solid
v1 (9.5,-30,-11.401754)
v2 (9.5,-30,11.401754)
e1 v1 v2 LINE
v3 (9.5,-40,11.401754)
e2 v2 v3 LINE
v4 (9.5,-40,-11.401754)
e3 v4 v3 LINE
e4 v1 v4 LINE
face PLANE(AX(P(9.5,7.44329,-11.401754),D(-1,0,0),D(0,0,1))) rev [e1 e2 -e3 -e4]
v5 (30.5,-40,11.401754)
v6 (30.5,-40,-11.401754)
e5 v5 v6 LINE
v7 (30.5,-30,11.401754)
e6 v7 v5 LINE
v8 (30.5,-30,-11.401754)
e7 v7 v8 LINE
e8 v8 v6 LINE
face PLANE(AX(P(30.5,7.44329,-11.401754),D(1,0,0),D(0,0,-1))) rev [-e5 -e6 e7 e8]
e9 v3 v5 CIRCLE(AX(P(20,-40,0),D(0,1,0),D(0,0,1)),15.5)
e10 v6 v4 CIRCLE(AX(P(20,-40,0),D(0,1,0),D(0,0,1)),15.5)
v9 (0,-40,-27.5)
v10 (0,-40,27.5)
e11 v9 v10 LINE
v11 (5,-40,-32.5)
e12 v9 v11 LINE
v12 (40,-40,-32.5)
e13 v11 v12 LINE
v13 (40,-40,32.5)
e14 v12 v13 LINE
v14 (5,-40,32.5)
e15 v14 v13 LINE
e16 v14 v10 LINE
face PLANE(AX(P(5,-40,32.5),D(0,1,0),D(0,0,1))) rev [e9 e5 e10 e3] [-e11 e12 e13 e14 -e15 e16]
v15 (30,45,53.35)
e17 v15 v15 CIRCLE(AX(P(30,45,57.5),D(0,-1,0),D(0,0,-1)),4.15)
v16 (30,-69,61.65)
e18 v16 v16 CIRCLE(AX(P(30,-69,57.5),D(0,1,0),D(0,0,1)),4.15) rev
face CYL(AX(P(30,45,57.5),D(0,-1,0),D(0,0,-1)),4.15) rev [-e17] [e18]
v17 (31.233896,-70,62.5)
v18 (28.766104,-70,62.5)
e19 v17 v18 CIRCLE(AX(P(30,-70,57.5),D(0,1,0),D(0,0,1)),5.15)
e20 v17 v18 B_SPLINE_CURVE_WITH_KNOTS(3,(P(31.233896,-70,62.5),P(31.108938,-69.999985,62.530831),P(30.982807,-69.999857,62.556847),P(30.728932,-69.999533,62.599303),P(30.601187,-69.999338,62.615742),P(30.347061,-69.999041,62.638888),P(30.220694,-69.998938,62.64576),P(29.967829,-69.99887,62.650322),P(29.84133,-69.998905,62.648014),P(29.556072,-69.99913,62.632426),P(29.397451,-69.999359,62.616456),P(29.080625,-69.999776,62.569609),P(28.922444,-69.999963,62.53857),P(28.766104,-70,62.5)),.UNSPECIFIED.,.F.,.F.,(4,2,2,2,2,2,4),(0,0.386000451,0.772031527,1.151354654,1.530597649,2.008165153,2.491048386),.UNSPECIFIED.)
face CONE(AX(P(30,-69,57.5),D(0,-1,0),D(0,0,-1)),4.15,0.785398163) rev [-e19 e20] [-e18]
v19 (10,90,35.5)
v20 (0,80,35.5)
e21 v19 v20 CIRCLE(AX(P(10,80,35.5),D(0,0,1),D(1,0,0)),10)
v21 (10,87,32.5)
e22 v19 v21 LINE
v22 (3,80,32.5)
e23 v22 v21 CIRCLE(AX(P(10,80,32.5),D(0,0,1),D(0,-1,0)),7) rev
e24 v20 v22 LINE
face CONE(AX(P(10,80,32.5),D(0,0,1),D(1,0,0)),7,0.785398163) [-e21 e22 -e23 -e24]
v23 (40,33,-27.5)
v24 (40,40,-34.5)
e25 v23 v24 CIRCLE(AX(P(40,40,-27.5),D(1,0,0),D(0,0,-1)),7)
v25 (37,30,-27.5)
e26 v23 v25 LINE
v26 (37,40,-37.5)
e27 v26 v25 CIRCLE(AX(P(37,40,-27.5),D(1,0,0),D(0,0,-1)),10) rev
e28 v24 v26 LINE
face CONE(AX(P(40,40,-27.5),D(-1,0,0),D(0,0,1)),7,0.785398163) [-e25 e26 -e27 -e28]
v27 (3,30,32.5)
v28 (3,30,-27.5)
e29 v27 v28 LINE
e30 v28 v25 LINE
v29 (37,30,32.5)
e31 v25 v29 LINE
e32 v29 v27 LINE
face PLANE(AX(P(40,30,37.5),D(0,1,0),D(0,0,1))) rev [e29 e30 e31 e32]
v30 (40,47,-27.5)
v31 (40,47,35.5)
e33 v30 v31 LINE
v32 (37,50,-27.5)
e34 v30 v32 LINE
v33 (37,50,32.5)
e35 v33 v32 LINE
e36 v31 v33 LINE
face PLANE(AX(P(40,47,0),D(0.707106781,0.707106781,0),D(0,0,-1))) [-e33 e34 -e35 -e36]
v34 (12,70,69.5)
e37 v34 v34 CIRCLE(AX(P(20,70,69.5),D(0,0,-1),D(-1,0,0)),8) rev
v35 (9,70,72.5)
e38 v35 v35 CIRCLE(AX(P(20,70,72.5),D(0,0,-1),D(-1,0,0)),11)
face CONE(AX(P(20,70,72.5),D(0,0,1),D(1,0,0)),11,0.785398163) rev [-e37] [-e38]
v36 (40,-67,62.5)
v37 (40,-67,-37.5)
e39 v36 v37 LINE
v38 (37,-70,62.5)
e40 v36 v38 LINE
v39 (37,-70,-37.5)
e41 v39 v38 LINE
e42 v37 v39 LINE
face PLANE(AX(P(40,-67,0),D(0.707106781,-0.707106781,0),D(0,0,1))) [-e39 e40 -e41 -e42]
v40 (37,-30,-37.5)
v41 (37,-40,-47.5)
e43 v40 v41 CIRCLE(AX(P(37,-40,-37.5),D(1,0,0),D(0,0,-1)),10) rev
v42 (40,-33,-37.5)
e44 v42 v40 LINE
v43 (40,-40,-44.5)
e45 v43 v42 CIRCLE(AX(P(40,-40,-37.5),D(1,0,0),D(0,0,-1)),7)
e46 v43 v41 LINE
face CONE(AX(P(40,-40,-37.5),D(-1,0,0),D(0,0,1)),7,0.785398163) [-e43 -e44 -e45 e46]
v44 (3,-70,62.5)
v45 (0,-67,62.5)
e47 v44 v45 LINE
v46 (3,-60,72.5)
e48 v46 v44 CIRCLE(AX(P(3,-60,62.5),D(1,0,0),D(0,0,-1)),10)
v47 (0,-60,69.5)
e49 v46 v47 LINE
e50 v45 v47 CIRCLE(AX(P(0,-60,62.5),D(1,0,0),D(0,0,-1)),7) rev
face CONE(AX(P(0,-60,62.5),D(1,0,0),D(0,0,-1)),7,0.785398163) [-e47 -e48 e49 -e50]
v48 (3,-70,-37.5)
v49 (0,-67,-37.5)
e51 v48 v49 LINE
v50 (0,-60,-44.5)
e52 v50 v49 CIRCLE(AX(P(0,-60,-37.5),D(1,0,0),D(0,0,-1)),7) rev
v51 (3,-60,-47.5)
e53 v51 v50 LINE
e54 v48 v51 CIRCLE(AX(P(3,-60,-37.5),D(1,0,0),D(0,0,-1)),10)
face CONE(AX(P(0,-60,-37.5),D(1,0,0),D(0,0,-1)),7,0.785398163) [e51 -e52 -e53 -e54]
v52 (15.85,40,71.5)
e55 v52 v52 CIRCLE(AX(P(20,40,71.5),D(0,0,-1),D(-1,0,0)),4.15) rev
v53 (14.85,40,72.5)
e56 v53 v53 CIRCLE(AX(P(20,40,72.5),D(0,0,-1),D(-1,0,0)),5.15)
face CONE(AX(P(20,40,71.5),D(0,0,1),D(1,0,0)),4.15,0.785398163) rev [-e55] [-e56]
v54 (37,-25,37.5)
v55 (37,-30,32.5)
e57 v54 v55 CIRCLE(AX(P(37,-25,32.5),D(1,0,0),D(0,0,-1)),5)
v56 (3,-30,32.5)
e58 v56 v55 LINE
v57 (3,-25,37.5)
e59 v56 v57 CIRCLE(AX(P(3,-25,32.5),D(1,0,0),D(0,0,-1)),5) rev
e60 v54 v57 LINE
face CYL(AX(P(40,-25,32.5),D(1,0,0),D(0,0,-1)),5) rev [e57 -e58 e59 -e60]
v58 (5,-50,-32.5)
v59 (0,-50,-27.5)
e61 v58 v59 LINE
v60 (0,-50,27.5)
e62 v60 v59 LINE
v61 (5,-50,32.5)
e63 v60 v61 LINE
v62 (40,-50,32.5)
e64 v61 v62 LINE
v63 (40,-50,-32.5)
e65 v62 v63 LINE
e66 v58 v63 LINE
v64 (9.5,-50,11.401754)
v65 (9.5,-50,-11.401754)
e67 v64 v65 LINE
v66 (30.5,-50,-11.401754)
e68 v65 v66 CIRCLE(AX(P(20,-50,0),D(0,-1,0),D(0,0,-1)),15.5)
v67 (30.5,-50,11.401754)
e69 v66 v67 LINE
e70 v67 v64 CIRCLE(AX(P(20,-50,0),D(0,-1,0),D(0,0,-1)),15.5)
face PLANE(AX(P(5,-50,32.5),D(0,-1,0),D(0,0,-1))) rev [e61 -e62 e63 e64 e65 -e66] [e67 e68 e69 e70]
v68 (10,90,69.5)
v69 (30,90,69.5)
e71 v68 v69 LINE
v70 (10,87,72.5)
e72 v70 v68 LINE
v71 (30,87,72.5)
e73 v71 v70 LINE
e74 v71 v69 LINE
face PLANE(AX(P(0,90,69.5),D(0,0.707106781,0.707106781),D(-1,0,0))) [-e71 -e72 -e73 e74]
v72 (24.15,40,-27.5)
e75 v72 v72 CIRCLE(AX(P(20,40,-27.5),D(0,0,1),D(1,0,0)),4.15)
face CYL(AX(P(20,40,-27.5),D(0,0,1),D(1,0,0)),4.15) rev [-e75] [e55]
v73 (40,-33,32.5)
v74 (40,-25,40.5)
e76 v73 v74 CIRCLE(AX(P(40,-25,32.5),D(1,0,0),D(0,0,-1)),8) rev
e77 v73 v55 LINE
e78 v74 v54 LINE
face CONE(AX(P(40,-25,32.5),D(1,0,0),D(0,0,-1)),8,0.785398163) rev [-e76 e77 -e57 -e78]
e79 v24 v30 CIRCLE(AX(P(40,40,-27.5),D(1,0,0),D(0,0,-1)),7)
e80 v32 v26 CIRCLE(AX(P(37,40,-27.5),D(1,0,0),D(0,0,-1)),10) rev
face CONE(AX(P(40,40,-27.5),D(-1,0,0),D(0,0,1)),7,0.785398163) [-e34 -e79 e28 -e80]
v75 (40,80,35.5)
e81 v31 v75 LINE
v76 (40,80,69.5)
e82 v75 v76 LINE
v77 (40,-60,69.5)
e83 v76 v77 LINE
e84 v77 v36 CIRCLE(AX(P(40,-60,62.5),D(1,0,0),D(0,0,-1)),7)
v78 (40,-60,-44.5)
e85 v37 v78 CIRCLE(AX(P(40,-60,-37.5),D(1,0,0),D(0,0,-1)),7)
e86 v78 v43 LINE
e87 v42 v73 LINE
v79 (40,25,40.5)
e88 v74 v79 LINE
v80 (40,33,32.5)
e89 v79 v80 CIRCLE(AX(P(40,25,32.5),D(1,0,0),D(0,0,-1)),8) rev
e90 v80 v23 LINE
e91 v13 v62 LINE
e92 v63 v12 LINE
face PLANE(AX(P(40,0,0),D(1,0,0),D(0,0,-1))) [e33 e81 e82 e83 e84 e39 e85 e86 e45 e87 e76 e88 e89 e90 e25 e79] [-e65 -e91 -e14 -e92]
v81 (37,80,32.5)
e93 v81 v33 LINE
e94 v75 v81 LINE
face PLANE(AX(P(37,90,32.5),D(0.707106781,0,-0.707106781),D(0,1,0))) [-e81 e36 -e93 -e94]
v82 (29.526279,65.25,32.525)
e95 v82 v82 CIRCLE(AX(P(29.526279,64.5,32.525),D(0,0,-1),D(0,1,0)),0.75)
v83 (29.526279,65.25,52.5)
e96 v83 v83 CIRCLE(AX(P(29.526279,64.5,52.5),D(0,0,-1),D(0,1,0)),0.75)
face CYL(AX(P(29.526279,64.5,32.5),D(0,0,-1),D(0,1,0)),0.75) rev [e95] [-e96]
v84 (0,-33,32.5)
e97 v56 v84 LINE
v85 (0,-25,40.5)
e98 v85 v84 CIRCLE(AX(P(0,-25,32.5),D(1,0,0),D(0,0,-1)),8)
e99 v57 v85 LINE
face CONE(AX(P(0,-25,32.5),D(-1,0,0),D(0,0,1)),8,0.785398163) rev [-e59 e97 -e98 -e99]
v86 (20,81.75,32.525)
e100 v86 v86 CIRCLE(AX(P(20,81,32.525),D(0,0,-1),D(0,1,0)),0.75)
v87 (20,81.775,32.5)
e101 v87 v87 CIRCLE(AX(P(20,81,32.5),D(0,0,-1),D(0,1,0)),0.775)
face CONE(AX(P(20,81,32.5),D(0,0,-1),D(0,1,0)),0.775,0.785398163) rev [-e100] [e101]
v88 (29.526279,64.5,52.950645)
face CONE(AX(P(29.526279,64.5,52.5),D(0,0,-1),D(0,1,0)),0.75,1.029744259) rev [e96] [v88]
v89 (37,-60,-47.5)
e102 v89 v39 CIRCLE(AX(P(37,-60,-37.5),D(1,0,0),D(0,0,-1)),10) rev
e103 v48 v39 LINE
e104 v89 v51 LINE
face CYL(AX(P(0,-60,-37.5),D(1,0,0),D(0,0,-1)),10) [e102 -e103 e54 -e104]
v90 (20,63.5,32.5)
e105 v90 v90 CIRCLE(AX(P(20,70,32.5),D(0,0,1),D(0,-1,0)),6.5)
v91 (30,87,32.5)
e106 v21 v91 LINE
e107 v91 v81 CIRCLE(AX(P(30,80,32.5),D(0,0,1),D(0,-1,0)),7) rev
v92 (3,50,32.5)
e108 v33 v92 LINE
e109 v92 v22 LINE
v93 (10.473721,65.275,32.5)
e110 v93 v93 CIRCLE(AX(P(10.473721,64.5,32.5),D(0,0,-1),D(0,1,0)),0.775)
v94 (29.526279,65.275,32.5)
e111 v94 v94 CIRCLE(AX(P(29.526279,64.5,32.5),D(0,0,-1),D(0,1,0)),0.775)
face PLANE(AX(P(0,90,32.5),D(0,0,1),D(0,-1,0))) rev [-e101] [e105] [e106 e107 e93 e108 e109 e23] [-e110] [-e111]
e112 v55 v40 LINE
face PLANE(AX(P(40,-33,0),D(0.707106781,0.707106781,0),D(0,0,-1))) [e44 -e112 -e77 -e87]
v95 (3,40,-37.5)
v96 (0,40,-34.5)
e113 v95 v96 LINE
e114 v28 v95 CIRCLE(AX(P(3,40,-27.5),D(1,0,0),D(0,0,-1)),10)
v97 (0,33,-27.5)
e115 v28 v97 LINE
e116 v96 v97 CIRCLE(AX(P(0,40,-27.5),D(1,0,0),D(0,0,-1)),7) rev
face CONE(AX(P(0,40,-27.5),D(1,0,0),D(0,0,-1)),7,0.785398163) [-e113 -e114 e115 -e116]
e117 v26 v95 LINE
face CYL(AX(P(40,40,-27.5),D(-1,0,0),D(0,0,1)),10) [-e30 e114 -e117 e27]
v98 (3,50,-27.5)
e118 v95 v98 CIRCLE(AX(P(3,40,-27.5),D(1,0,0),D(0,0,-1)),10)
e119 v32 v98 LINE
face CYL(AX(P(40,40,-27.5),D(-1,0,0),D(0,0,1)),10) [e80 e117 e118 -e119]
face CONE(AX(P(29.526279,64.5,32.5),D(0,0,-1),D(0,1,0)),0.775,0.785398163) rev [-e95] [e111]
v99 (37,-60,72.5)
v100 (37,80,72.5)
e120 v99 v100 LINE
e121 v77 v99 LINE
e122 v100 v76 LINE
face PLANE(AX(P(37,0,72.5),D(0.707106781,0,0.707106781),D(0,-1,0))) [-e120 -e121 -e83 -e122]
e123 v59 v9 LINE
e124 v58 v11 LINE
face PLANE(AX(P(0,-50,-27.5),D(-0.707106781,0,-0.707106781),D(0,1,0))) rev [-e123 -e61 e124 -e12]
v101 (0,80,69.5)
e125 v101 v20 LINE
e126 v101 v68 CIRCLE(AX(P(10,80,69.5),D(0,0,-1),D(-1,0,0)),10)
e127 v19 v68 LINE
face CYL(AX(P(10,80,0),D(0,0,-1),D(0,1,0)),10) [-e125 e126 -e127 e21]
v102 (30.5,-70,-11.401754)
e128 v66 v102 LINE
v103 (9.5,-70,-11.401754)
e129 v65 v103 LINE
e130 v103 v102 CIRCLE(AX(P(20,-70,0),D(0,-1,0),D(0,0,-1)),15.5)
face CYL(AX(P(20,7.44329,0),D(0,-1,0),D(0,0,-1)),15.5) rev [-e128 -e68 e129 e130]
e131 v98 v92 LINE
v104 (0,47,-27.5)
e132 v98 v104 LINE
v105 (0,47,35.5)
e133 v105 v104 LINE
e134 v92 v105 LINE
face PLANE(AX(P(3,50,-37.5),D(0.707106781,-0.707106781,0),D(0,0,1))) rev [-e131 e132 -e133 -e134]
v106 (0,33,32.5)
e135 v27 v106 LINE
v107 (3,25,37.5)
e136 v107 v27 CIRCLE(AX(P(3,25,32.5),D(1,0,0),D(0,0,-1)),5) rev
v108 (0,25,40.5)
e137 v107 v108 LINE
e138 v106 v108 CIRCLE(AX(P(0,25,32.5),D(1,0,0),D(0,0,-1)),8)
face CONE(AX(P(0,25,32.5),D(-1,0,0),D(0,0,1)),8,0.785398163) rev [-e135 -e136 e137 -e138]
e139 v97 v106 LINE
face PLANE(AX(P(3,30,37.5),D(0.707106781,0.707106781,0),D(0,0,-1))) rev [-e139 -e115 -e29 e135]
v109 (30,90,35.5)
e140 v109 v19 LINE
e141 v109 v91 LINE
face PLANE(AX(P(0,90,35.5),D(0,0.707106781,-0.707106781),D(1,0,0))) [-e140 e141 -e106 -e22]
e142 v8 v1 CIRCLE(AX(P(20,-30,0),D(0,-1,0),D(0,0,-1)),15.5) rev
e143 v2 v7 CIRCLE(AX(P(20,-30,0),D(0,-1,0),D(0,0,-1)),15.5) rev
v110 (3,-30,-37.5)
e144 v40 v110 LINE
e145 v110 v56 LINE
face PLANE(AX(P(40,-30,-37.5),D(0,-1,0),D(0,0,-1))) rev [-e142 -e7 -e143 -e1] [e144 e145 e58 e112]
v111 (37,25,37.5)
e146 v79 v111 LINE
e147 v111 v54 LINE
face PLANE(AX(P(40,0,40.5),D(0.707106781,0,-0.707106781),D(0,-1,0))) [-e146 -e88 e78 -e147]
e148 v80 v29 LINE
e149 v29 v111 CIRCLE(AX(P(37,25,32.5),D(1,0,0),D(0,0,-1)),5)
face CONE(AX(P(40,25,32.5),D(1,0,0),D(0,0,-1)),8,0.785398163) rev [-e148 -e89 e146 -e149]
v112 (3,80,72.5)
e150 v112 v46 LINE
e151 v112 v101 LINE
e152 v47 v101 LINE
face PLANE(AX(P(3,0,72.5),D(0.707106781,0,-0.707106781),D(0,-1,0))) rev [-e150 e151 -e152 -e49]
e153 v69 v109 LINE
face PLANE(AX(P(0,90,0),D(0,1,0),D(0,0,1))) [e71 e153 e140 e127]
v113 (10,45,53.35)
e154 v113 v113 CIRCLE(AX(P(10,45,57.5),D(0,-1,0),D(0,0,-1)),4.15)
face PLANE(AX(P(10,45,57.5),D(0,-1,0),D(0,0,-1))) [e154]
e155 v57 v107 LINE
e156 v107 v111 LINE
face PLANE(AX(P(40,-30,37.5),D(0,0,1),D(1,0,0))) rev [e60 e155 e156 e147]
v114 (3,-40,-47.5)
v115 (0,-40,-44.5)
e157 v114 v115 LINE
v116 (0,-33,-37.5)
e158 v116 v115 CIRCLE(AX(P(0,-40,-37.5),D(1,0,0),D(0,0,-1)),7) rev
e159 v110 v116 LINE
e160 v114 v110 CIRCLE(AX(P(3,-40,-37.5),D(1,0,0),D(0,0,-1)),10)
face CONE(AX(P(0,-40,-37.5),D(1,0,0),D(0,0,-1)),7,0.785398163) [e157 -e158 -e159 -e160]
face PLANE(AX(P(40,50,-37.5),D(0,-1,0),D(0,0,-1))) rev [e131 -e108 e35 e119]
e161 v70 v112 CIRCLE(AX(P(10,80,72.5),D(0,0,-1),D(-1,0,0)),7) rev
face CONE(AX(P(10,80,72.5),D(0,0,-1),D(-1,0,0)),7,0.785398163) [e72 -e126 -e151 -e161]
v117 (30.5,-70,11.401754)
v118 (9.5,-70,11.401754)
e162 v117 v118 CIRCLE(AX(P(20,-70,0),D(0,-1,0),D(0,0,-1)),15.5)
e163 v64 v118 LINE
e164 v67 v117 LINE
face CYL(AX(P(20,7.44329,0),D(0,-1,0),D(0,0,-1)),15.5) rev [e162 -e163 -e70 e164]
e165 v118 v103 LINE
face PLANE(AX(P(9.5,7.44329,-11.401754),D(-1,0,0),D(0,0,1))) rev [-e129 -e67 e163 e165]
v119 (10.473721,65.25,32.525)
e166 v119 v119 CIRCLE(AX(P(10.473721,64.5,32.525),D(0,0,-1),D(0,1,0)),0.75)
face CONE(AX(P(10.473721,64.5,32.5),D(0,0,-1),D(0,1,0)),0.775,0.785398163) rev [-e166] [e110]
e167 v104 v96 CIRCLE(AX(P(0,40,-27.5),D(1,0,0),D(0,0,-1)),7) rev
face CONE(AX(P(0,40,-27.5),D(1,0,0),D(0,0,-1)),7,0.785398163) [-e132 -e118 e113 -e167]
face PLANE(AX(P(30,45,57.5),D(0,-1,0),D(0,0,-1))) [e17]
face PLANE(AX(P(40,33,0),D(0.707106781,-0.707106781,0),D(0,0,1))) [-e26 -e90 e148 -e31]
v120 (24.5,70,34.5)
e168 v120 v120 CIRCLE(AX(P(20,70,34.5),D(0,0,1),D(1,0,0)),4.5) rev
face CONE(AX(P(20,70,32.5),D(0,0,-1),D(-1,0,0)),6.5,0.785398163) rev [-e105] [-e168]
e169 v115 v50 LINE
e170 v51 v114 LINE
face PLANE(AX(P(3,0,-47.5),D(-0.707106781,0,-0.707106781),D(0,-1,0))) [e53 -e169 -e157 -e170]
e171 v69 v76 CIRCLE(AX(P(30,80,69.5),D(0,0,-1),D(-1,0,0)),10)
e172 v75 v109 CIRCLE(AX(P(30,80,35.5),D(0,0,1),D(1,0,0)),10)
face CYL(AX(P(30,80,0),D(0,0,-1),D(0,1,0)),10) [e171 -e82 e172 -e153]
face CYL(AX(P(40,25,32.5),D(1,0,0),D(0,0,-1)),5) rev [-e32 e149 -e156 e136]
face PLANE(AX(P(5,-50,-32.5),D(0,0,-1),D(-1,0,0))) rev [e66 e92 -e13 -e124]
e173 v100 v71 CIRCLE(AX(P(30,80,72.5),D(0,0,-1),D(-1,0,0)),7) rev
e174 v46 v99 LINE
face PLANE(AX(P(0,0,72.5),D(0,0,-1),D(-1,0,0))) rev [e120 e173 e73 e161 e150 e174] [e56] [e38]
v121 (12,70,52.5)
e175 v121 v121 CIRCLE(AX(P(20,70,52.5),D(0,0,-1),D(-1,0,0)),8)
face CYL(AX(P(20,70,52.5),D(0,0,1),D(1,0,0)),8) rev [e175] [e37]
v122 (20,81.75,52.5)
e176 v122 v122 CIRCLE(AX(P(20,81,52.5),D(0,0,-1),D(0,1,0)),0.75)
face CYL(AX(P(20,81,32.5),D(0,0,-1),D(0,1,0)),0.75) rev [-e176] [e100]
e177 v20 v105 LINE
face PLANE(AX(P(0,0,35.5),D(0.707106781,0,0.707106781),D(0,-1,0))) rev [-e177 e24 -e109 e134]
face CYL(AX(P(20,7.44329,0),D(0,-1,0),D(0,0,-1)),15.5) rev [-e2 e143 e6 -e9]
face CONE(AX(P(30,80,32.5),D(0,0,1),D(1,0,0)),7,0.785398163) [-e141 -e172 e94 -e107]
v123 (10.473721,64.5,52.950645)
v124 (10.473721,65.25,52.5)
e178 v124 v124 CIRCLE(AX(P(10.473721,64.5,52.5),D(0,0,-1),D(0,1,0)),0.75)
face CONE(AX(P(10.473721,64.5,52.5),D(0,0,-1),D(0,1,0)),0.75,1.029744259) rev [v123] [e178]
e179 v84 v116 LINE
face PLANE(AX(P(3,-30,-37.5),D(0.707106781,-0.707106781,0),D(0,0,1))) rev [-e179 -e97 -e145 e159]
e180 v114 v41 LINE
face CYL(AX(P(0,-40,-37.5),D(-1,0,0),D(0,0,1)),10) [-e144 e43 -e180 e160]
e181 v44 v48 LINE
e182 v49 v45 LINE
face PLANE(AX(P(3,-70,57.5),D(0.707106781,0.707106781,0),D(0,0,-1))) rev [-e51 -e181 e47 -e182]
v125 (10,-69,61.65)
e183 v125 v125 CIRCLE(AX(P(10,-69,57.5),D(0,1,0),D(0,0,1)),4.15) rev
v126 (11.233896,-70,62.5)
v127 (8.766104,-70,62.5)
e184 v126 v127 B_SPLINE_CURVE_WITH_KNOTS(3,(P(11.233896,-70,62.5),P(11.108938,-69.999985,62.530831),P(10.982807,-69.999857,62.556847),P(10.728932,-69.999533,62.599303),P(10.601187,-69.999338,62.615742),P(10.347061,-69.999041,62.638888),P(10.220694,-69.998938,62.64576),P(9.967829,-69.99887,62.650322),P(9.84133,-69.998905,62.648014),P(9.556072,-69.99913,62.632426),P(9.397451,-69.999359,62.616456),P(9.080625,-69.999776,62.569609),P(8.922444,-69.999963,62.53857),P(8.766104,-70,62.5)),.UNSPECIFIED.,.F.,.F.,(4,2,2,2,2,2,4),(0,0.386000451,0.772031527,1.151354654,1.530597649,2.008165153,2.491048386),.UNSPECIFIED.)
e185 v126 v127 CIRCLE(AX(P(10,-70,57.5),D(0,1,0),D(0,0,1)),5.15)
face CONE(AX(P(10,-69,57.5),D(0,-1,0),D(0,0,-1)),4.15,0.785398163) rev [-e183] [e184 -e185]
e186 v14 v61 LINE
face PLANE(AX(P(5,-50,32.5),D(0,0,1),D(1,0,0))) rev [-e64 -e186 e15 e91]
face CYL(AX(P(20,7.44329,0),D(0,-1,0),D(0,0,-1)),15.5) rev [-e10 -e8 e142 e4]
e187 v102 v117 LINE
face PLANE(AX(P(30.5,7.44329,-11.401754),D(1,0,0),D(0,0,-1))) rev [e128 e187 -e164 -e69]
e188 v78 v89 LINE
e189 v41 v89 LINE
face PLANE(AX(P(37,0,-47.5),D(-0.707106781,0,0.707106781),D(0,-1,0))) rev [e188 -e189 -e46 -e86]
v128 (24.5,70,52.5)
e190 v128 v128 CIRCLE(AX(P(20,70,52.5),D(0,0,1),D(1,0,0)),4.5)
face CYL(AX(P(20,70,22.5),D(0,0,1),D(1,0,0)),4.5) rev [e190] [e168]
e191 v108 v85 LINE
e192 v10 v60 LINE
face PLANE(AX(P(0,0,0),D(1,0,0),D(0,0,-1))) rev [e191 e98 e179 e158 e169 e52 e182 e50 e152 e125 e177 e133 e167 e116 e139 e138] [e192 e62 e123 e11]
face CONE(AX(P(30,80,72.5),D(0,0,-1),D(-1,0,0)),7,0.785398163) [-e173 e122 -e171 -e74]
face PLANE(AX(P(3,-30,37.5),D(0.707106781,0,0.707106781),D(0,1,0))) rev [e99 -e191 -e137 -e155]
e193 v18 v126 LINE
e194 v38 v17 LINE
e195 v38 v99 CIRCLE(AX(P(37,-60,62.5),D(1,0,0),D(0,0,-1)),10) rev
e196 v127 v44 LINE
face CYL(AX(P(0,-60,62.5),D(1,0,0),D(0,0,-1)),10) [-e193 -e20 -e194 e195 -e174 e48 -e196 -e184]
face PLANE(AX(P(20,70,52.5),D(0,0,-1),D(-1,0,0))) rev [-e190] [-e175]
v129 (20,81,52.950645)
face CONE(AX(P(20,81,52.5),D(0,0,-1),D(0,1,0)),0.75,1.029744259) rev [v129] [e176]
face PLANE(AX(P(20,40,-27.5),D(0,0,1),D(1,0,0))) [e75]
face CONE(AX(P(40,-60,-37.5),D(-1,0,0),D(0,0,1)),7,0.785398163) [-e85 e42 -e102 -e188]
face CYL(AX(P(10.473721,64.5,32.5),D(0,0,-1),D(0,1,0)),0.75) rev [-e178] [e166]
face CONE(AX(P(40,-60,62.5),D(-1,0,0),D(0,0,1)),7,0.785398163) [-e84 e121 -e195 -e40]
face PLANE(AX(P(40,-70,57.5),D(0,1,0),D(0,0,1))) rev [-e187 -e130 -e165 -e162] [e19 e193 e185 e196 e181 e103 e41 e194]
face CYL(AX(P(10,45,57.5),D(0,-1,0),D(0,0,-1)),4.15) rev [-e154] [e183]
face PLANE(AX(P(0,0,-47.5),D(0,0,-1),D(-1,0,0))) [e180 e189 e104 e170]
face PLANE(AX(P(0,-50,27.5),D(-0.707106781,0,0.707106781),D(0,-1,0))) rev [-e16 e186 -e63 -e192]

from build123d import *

# Parameters (mm, degrees)
BOSS_EXTRUDE1_DEPTH             = 40
SKETCH2_W                       = 65
SKETCH2_H                       = 10
CUT_EXTRUDE1_DEPTH              = 35
CUT_EXTRUDE2_DEPTH              = 40
SKETCH4_W                       = 55
SKETCH4_H                       = 10
CUT_EXTRUDE3_DEPTH              = 98.114622998
CHAMFER1_SIZE                   = 5
SKETCH5_W                       = 40
SKETCH5_H                       = 120
BOSS_EXTRUDE2_DEPTH             = 15
SKETCH16_W                      = 40
SKETCH16_H                      = 40
BOSS_EXTRUDE4_DEPTH             = 10
SKETCH6_R                       = 4.15
CUT_EXTRUDE4_DEPTH              = 115
CHAMFER2_SIZE                   = 1
FILLET1_R                       = 10
FILLET2_R                       = 5
SKETCH9_W                       = 40
SKETCH9_H                       = 40
BOSS_EXTRUDE3_DEPTH             = 40
FILLET3_R                       = 10
SKETCH10_R                      = 8
CUT_EXTRUDE6_DEPTH              = 20
SKETCH11_R                      = 4.5
CUT_EXTRUDE7_DEPTH              = 30
SKETCH12_R                      = 4.15
CUT_EXTRUDE8_DEPTH              = 100
CHAMFER7_SIZE                   = 1
FILLET5_R                       = 10
CHAMFER10_SIZE                  = 3
CHAMFER11_SIZE                  = 2
FILLET6_R                       = 10
CHAMFER13_SIZE                  = 3
F_1_5MM_DOWEL_HOLE1_D           = 1.5
F_1_5MM_DOWEL_HOLE1_DEPTH       = 20
F_1_5MM_DOWEL_HOLE1_CSINK_D     = 1.55
F_1_5MM_DOWEL_HOLE1_CSINK_ANGLE = 90
F_1_5MM_DOWEL_HOLE1_TIP         = 0.450645464


# Some blends are built 0.0001 mm under size
with BuildPart() as part:
    # Sketch1 → Boss-Extrude1 (new body)
    with BuildSketch(Plane(origin=(0, 0, 0), x_dir=(0, 0, -1), z_dir=(1, 0, 0))):
        Polygon((37.5, 30), (37.5, 50), (-57.5, 50), (-57.5, -70), (37.5, -70), (37.5, -30), (-37.5, -30), (-37.5, 30), align=None)
    extrude(amount=BOSS_EXTRUDE1_DEPTH)

    # Sketch2 → Cut-Extrude1 (cut)
    with BuildSketch(Plane(origin=(40, 0, 0), x_dir=(0, 0, -1), z_dir=(1, 0, 0))):
        with Locations((0, -45)):
            Rectangle(SKETCH2_W, SKETCH2_H)
    extrude(amount=-CUT_EXTRUDE1_DEPTH, mode=Mode.SUBTRACT)

    # Sketch3 → Cut-Extrude2 (cut)
    with BuildSketch(Plane.XZ.offset(70)):
        with BuildLine():
            Line((9.5, -11.401754251), (9.5, 11.401754251))
            ThreePointArc((9.5, 11.401754251), (20, 15.5), (30.5, 11.401754251))
            Line((30.5, 11.401754251), (30.5, -11.401754251))
            ThreePointArc((30.5, -11.401754251), (20, -15.5), (9.5, -11.401754251))
        make_face()
    extrude(amount=-CUT_EXTRUDE2_DEPTH, mode=Mode.SUBTRACT)

    # Sketch4 → Cut-Extrude3 (cut, through all)
    with BuildSketch(Plane(origin=(5, 0, 0), x_dir=(0, 0, -1), z_dir=(1, 0, 0))):
        with Locations((0, -45)):
            Rectangle(SKETCH4_W, SKETCH4_H)
    extrude(amount=-CUT_EXTRUDE3_DEPTH, mode=Mode.SUBTRACT)

    # Chamfer1
    chamfer1_edges = [part.edges().sort_by_distance(p)[0] for p in [
        (5, -45, 27.5),
        (5, -45, -27.5),
    ]]
    chamfer(chamfer1_edges, length=CHAMFER1_SIZE - 0.0001)  # a hair under: the kernel refuses the full size

    # Sketch5 → Boss-Extrude2 (add)
    with BuildSketch(Plane.XY.offset(57.5)):
        with Locations((20, -10)):
            Rectangle(SKETCH5_W, SKETCH5_H)
    extrude(amount=BOSS_EXTRUDE2_DEPTH)

    # Sketch16 → Boss-Extrude4 (add)
    with BuildSketch(Plane(origin=(0, 0, -37.5), x_dir=(-1, 0, 0), z_dir=(0, 0, -1))):
        with Locations((-20, -50)):
            Rectangle(SKETCH16_W, SKETCH16_H)
    extrude(amount=BOSS_EXTRUDE4_DEPTH)

    # Sketch6 → Cut-Extrude4 (cut)
    with BuildSketch(Plane.XZ.offset(70)):
        with Locations(Location((30, 57.5, 0), (0, 0, 270))):
            Circle(SKETCH6_R)
        with Locations(Location((10, 57.5, 0), (0, 0, 270))):
            Circle(SKETCH6_R)
    extrude(amount=-CUT_EXTRUDE4_DEPTH, mode=Mode.SUBTRACT)

    # Chamfer2
    chamfer2_edges = [part.edges().sort_by_distance(p)[0] for p in [
        (30, -70, 61.65),
        (10, -70, 61.65),
    ]]
    chamfer(chamfer2_edges, length=CHAMFER2_SIZE)

    # Fillet1
    # the kernel refuses this fillet: 10 mm, written as the material it takes off along each edge
    with BuildSketch(Plane(origin=(-25, -70, -47.5), x_dir=(0, 0, 1), z_dir=(1, 0, 0))) as fillet1_piece_1:
        with BuildLine():
            CenterArc((FILLET1_R, -FILLET1_R), FILLET1_R, 90, 90)
            Line((0, -FILLET1_R), (0, 0))
            Line((0, 0), (FILLET1_R, 0))
        make_face()
    extrude(amount=90, mode=Mode.SUBTRACT)
    with BuildSketch(Plane(origin=(65, -30, -47.5), x_dir=(0, -1, 0), z_dir=(-1, 0, 0)), Plane(origin=(-25, -70, 72.5), x_dir=(0, 0, -1), z_dir=(1, 0, 0))) as fillet1_piece_2:
        with BuildLine():
            CenterArc((FILLET1_R, FILLET1_R), FILLET1_R, 180, 90)
            Line((0, FILLET1_R), (0, 0))
            Line((0, 0), (FILLET1_R, 0))
        make_face()
    extrude(amount=90, mode=Mode.SUBTRACT)

    # Fillet2
    fillet2_edges = [part.edges().sort_by_distance(p)[0] for p in [
        (20, 30, 37.5),
        (20, -30, 37.5),
    ]]
    fillet(fillet2_edges, radius=FILLET2_R)

    # Sketch9 → Boss-Extrude3 (add)
    with BuildSketch(Plane(origin=(0, 50, 0), x_dir=(1, 0, 0), z_dir=(0, 1, 0))):
        with Locations((20, -52.5)):
            Rectangle(SKETCH9_W, SKETCH9_H)
    extrude(amount=BOSS_EXTRUDE3_DEPTH)

    # Fillet3
    fillet3_edges = [part.edges().sort_by_distance(p)[0] for p in [
        (0, 90, 52.5),
        (40, 90, 52.5),
    ]]
    fillet(fillet3_edges, radius=FILLET3_R)

    # Sketch10 → Cut-Extrude6 (cut)
    with BuildSketch(Plane(origin=(0, 0, 72.5), x_dir=(-1, 0, 0), z_dir=(0, 0, -1))):
        with Locations((-20, 70)):
            Circle(SKETCH10_R)
    extrude(amount=CUT_EXTRUDE6_DEPTH, mode=Mode.SUBTRACT)

    # Sketch11 → Cut-Extrude7 (cut)
    with BuildSketch(Plane.XY.offset(52.5)):
        with Locations((20, 70)):
            Circle(SKETCH11_R)
    extrude(amount=-CUT_EXTRUDE7_DEPTH, mode=Mode.SUBTRACT)

    # Sketch12 → Cut-Extrude8 (cut)
    with BuildSketch(Plane.XY.offset(72.5)):
        with Locations((20, 40)):
            Circle(SKETCH12_R)
    extrude(amount=-CUT_EXTRUDE8_DEPTH, mode=Mode.SUBTRACT)

    # Chamfer7
    chamfer7_edges = [part.edges().sort_by_distance(p)[0] for p in [
        (15.85, 40, 72.5),
    ]]
    chamfer(chamfer7_edges, length=CHAMFER7_SIZE)

    # Fillet5
    fillet5_edges = [part.edges().sort_by_distance(p)[0] for p in [
        (20, 30, -37.5),
    ]]
    fillet(fillet5_edges, radius=FILLET5_R)

    # Chamfer10
    chamfer10_edges = [part.edges().sort_by_distance(p)[0] for p in [
        (28, 70, 72.5),
    ]]
    chamfer(chamfer10_edges, length=CHAMFER10_SIZE)

    # Chamfer11
    chamfer11_edges = [part.edges().sort_by_distance(p)[0] for p in [
        (15.5, 70, 32.5),
    ]]
    chamfer(chamfer11_edges, length=CHAMFER11_SIZE)

    # Fillet6
    fillet6_edges = [part.edges().sort_by_distance(p)[0] for p in [
        (20, 50, -37.5),
    ]]
    fillet(fillet6_edges, radius=FILLET6_R - 0.0001)  # a hair under: the kernel refuses the full size

    # Chamfer13
    chamfer13_edges = [part.edges().sort_by_distance(p)[0] for p in [
        (40, -50, -47.5),
        (0, -50, -47.5),
        (0, -30, -2.5),
        (0, -70, 12.5),
        (0, -67.071067812, 69.571067812),
        (0, -32.928932188, -44.571067812),
        (0, -67.071067812, -44.571067812),
        (40, -70, 12.5),
        (40, 10, 72.5),
        (40, -30, -2.5),
        (40, -67.071067812, 69.571067812),
        (40, -32.928932188, -44.571067812),
        (40, -67.071067812, -44.571067812),
        (0, 0, 37.5),
        (40, 0, 37.5),
        (0, 30, 2.5),
        (40, 30, 2.5),
        (0, -28.535533906, 36.035533906),
        (40, -28.535533906, 36.035533906),
        (0, 28.535533906, 36.035533906),
        (40, 28.535533906, 36.035533906),
        (20, 90, 72.5),
        (20, 90, 32.5),
        (0, 10, 72.5),
        (37.071067812, 87.071067812, 72.5),
        (2.928932188, 87.071067812, 72.5),
        (0, 65, 32.5),
        (40, 65, 32.5),
        (37.071067812, 87.071067812, 32.5),
        (2.928932188, 87.071067812, 32.5),
        (0, 32.928932188, -34.571067812),
        (40, 32.928932188, -34.571067812),
        (40, 50, 2.49995),
        (0, 50, 2.49995),
        (0, 47.071097101, -34.571097101),
        (40, 47.071097101, -34.571097101),
    ]]
    chamfer(chamfer13_edges, length=CHAMFER13_SIZE)

    # Ø1.5mm Dowel Hole1
    with Locations(Plane(origin=(0, 0, 32.5), x_dir=(-1, 0, 0), z_dir=(0, 0, -1))):
        with Locations((-29.526279442, 64.5), (-20, 81), (-10.473720558, 64.5), (-20, 70)):
            CounterSinkHole(F_1_5MM_DOWEL_HOLE1_D / 2, F_1_5MM_DOWEL_HOLE1_CSINK_D / 2, depth=F_1_5MM_DOWEL_HOLE1_DEPTH, counter_sink_angle=F_1_5MM_DOWEL_HOLE1_CSINK_ANGLE)
            with Locations((0, 0, -(F_1_5MM_DOWEL_HOLE1_DEPTH + F_1_5MM_DOWEL_HOLE1_TIP / 2))):  # 118° drill point
                Cone(0, F_1_5MM_DOWEL_HOLE1_D / 2, F_1_5MM_DOWEL_HOLE1_TIP, mode=Mode.SUBTRACT)


solid = part.part
